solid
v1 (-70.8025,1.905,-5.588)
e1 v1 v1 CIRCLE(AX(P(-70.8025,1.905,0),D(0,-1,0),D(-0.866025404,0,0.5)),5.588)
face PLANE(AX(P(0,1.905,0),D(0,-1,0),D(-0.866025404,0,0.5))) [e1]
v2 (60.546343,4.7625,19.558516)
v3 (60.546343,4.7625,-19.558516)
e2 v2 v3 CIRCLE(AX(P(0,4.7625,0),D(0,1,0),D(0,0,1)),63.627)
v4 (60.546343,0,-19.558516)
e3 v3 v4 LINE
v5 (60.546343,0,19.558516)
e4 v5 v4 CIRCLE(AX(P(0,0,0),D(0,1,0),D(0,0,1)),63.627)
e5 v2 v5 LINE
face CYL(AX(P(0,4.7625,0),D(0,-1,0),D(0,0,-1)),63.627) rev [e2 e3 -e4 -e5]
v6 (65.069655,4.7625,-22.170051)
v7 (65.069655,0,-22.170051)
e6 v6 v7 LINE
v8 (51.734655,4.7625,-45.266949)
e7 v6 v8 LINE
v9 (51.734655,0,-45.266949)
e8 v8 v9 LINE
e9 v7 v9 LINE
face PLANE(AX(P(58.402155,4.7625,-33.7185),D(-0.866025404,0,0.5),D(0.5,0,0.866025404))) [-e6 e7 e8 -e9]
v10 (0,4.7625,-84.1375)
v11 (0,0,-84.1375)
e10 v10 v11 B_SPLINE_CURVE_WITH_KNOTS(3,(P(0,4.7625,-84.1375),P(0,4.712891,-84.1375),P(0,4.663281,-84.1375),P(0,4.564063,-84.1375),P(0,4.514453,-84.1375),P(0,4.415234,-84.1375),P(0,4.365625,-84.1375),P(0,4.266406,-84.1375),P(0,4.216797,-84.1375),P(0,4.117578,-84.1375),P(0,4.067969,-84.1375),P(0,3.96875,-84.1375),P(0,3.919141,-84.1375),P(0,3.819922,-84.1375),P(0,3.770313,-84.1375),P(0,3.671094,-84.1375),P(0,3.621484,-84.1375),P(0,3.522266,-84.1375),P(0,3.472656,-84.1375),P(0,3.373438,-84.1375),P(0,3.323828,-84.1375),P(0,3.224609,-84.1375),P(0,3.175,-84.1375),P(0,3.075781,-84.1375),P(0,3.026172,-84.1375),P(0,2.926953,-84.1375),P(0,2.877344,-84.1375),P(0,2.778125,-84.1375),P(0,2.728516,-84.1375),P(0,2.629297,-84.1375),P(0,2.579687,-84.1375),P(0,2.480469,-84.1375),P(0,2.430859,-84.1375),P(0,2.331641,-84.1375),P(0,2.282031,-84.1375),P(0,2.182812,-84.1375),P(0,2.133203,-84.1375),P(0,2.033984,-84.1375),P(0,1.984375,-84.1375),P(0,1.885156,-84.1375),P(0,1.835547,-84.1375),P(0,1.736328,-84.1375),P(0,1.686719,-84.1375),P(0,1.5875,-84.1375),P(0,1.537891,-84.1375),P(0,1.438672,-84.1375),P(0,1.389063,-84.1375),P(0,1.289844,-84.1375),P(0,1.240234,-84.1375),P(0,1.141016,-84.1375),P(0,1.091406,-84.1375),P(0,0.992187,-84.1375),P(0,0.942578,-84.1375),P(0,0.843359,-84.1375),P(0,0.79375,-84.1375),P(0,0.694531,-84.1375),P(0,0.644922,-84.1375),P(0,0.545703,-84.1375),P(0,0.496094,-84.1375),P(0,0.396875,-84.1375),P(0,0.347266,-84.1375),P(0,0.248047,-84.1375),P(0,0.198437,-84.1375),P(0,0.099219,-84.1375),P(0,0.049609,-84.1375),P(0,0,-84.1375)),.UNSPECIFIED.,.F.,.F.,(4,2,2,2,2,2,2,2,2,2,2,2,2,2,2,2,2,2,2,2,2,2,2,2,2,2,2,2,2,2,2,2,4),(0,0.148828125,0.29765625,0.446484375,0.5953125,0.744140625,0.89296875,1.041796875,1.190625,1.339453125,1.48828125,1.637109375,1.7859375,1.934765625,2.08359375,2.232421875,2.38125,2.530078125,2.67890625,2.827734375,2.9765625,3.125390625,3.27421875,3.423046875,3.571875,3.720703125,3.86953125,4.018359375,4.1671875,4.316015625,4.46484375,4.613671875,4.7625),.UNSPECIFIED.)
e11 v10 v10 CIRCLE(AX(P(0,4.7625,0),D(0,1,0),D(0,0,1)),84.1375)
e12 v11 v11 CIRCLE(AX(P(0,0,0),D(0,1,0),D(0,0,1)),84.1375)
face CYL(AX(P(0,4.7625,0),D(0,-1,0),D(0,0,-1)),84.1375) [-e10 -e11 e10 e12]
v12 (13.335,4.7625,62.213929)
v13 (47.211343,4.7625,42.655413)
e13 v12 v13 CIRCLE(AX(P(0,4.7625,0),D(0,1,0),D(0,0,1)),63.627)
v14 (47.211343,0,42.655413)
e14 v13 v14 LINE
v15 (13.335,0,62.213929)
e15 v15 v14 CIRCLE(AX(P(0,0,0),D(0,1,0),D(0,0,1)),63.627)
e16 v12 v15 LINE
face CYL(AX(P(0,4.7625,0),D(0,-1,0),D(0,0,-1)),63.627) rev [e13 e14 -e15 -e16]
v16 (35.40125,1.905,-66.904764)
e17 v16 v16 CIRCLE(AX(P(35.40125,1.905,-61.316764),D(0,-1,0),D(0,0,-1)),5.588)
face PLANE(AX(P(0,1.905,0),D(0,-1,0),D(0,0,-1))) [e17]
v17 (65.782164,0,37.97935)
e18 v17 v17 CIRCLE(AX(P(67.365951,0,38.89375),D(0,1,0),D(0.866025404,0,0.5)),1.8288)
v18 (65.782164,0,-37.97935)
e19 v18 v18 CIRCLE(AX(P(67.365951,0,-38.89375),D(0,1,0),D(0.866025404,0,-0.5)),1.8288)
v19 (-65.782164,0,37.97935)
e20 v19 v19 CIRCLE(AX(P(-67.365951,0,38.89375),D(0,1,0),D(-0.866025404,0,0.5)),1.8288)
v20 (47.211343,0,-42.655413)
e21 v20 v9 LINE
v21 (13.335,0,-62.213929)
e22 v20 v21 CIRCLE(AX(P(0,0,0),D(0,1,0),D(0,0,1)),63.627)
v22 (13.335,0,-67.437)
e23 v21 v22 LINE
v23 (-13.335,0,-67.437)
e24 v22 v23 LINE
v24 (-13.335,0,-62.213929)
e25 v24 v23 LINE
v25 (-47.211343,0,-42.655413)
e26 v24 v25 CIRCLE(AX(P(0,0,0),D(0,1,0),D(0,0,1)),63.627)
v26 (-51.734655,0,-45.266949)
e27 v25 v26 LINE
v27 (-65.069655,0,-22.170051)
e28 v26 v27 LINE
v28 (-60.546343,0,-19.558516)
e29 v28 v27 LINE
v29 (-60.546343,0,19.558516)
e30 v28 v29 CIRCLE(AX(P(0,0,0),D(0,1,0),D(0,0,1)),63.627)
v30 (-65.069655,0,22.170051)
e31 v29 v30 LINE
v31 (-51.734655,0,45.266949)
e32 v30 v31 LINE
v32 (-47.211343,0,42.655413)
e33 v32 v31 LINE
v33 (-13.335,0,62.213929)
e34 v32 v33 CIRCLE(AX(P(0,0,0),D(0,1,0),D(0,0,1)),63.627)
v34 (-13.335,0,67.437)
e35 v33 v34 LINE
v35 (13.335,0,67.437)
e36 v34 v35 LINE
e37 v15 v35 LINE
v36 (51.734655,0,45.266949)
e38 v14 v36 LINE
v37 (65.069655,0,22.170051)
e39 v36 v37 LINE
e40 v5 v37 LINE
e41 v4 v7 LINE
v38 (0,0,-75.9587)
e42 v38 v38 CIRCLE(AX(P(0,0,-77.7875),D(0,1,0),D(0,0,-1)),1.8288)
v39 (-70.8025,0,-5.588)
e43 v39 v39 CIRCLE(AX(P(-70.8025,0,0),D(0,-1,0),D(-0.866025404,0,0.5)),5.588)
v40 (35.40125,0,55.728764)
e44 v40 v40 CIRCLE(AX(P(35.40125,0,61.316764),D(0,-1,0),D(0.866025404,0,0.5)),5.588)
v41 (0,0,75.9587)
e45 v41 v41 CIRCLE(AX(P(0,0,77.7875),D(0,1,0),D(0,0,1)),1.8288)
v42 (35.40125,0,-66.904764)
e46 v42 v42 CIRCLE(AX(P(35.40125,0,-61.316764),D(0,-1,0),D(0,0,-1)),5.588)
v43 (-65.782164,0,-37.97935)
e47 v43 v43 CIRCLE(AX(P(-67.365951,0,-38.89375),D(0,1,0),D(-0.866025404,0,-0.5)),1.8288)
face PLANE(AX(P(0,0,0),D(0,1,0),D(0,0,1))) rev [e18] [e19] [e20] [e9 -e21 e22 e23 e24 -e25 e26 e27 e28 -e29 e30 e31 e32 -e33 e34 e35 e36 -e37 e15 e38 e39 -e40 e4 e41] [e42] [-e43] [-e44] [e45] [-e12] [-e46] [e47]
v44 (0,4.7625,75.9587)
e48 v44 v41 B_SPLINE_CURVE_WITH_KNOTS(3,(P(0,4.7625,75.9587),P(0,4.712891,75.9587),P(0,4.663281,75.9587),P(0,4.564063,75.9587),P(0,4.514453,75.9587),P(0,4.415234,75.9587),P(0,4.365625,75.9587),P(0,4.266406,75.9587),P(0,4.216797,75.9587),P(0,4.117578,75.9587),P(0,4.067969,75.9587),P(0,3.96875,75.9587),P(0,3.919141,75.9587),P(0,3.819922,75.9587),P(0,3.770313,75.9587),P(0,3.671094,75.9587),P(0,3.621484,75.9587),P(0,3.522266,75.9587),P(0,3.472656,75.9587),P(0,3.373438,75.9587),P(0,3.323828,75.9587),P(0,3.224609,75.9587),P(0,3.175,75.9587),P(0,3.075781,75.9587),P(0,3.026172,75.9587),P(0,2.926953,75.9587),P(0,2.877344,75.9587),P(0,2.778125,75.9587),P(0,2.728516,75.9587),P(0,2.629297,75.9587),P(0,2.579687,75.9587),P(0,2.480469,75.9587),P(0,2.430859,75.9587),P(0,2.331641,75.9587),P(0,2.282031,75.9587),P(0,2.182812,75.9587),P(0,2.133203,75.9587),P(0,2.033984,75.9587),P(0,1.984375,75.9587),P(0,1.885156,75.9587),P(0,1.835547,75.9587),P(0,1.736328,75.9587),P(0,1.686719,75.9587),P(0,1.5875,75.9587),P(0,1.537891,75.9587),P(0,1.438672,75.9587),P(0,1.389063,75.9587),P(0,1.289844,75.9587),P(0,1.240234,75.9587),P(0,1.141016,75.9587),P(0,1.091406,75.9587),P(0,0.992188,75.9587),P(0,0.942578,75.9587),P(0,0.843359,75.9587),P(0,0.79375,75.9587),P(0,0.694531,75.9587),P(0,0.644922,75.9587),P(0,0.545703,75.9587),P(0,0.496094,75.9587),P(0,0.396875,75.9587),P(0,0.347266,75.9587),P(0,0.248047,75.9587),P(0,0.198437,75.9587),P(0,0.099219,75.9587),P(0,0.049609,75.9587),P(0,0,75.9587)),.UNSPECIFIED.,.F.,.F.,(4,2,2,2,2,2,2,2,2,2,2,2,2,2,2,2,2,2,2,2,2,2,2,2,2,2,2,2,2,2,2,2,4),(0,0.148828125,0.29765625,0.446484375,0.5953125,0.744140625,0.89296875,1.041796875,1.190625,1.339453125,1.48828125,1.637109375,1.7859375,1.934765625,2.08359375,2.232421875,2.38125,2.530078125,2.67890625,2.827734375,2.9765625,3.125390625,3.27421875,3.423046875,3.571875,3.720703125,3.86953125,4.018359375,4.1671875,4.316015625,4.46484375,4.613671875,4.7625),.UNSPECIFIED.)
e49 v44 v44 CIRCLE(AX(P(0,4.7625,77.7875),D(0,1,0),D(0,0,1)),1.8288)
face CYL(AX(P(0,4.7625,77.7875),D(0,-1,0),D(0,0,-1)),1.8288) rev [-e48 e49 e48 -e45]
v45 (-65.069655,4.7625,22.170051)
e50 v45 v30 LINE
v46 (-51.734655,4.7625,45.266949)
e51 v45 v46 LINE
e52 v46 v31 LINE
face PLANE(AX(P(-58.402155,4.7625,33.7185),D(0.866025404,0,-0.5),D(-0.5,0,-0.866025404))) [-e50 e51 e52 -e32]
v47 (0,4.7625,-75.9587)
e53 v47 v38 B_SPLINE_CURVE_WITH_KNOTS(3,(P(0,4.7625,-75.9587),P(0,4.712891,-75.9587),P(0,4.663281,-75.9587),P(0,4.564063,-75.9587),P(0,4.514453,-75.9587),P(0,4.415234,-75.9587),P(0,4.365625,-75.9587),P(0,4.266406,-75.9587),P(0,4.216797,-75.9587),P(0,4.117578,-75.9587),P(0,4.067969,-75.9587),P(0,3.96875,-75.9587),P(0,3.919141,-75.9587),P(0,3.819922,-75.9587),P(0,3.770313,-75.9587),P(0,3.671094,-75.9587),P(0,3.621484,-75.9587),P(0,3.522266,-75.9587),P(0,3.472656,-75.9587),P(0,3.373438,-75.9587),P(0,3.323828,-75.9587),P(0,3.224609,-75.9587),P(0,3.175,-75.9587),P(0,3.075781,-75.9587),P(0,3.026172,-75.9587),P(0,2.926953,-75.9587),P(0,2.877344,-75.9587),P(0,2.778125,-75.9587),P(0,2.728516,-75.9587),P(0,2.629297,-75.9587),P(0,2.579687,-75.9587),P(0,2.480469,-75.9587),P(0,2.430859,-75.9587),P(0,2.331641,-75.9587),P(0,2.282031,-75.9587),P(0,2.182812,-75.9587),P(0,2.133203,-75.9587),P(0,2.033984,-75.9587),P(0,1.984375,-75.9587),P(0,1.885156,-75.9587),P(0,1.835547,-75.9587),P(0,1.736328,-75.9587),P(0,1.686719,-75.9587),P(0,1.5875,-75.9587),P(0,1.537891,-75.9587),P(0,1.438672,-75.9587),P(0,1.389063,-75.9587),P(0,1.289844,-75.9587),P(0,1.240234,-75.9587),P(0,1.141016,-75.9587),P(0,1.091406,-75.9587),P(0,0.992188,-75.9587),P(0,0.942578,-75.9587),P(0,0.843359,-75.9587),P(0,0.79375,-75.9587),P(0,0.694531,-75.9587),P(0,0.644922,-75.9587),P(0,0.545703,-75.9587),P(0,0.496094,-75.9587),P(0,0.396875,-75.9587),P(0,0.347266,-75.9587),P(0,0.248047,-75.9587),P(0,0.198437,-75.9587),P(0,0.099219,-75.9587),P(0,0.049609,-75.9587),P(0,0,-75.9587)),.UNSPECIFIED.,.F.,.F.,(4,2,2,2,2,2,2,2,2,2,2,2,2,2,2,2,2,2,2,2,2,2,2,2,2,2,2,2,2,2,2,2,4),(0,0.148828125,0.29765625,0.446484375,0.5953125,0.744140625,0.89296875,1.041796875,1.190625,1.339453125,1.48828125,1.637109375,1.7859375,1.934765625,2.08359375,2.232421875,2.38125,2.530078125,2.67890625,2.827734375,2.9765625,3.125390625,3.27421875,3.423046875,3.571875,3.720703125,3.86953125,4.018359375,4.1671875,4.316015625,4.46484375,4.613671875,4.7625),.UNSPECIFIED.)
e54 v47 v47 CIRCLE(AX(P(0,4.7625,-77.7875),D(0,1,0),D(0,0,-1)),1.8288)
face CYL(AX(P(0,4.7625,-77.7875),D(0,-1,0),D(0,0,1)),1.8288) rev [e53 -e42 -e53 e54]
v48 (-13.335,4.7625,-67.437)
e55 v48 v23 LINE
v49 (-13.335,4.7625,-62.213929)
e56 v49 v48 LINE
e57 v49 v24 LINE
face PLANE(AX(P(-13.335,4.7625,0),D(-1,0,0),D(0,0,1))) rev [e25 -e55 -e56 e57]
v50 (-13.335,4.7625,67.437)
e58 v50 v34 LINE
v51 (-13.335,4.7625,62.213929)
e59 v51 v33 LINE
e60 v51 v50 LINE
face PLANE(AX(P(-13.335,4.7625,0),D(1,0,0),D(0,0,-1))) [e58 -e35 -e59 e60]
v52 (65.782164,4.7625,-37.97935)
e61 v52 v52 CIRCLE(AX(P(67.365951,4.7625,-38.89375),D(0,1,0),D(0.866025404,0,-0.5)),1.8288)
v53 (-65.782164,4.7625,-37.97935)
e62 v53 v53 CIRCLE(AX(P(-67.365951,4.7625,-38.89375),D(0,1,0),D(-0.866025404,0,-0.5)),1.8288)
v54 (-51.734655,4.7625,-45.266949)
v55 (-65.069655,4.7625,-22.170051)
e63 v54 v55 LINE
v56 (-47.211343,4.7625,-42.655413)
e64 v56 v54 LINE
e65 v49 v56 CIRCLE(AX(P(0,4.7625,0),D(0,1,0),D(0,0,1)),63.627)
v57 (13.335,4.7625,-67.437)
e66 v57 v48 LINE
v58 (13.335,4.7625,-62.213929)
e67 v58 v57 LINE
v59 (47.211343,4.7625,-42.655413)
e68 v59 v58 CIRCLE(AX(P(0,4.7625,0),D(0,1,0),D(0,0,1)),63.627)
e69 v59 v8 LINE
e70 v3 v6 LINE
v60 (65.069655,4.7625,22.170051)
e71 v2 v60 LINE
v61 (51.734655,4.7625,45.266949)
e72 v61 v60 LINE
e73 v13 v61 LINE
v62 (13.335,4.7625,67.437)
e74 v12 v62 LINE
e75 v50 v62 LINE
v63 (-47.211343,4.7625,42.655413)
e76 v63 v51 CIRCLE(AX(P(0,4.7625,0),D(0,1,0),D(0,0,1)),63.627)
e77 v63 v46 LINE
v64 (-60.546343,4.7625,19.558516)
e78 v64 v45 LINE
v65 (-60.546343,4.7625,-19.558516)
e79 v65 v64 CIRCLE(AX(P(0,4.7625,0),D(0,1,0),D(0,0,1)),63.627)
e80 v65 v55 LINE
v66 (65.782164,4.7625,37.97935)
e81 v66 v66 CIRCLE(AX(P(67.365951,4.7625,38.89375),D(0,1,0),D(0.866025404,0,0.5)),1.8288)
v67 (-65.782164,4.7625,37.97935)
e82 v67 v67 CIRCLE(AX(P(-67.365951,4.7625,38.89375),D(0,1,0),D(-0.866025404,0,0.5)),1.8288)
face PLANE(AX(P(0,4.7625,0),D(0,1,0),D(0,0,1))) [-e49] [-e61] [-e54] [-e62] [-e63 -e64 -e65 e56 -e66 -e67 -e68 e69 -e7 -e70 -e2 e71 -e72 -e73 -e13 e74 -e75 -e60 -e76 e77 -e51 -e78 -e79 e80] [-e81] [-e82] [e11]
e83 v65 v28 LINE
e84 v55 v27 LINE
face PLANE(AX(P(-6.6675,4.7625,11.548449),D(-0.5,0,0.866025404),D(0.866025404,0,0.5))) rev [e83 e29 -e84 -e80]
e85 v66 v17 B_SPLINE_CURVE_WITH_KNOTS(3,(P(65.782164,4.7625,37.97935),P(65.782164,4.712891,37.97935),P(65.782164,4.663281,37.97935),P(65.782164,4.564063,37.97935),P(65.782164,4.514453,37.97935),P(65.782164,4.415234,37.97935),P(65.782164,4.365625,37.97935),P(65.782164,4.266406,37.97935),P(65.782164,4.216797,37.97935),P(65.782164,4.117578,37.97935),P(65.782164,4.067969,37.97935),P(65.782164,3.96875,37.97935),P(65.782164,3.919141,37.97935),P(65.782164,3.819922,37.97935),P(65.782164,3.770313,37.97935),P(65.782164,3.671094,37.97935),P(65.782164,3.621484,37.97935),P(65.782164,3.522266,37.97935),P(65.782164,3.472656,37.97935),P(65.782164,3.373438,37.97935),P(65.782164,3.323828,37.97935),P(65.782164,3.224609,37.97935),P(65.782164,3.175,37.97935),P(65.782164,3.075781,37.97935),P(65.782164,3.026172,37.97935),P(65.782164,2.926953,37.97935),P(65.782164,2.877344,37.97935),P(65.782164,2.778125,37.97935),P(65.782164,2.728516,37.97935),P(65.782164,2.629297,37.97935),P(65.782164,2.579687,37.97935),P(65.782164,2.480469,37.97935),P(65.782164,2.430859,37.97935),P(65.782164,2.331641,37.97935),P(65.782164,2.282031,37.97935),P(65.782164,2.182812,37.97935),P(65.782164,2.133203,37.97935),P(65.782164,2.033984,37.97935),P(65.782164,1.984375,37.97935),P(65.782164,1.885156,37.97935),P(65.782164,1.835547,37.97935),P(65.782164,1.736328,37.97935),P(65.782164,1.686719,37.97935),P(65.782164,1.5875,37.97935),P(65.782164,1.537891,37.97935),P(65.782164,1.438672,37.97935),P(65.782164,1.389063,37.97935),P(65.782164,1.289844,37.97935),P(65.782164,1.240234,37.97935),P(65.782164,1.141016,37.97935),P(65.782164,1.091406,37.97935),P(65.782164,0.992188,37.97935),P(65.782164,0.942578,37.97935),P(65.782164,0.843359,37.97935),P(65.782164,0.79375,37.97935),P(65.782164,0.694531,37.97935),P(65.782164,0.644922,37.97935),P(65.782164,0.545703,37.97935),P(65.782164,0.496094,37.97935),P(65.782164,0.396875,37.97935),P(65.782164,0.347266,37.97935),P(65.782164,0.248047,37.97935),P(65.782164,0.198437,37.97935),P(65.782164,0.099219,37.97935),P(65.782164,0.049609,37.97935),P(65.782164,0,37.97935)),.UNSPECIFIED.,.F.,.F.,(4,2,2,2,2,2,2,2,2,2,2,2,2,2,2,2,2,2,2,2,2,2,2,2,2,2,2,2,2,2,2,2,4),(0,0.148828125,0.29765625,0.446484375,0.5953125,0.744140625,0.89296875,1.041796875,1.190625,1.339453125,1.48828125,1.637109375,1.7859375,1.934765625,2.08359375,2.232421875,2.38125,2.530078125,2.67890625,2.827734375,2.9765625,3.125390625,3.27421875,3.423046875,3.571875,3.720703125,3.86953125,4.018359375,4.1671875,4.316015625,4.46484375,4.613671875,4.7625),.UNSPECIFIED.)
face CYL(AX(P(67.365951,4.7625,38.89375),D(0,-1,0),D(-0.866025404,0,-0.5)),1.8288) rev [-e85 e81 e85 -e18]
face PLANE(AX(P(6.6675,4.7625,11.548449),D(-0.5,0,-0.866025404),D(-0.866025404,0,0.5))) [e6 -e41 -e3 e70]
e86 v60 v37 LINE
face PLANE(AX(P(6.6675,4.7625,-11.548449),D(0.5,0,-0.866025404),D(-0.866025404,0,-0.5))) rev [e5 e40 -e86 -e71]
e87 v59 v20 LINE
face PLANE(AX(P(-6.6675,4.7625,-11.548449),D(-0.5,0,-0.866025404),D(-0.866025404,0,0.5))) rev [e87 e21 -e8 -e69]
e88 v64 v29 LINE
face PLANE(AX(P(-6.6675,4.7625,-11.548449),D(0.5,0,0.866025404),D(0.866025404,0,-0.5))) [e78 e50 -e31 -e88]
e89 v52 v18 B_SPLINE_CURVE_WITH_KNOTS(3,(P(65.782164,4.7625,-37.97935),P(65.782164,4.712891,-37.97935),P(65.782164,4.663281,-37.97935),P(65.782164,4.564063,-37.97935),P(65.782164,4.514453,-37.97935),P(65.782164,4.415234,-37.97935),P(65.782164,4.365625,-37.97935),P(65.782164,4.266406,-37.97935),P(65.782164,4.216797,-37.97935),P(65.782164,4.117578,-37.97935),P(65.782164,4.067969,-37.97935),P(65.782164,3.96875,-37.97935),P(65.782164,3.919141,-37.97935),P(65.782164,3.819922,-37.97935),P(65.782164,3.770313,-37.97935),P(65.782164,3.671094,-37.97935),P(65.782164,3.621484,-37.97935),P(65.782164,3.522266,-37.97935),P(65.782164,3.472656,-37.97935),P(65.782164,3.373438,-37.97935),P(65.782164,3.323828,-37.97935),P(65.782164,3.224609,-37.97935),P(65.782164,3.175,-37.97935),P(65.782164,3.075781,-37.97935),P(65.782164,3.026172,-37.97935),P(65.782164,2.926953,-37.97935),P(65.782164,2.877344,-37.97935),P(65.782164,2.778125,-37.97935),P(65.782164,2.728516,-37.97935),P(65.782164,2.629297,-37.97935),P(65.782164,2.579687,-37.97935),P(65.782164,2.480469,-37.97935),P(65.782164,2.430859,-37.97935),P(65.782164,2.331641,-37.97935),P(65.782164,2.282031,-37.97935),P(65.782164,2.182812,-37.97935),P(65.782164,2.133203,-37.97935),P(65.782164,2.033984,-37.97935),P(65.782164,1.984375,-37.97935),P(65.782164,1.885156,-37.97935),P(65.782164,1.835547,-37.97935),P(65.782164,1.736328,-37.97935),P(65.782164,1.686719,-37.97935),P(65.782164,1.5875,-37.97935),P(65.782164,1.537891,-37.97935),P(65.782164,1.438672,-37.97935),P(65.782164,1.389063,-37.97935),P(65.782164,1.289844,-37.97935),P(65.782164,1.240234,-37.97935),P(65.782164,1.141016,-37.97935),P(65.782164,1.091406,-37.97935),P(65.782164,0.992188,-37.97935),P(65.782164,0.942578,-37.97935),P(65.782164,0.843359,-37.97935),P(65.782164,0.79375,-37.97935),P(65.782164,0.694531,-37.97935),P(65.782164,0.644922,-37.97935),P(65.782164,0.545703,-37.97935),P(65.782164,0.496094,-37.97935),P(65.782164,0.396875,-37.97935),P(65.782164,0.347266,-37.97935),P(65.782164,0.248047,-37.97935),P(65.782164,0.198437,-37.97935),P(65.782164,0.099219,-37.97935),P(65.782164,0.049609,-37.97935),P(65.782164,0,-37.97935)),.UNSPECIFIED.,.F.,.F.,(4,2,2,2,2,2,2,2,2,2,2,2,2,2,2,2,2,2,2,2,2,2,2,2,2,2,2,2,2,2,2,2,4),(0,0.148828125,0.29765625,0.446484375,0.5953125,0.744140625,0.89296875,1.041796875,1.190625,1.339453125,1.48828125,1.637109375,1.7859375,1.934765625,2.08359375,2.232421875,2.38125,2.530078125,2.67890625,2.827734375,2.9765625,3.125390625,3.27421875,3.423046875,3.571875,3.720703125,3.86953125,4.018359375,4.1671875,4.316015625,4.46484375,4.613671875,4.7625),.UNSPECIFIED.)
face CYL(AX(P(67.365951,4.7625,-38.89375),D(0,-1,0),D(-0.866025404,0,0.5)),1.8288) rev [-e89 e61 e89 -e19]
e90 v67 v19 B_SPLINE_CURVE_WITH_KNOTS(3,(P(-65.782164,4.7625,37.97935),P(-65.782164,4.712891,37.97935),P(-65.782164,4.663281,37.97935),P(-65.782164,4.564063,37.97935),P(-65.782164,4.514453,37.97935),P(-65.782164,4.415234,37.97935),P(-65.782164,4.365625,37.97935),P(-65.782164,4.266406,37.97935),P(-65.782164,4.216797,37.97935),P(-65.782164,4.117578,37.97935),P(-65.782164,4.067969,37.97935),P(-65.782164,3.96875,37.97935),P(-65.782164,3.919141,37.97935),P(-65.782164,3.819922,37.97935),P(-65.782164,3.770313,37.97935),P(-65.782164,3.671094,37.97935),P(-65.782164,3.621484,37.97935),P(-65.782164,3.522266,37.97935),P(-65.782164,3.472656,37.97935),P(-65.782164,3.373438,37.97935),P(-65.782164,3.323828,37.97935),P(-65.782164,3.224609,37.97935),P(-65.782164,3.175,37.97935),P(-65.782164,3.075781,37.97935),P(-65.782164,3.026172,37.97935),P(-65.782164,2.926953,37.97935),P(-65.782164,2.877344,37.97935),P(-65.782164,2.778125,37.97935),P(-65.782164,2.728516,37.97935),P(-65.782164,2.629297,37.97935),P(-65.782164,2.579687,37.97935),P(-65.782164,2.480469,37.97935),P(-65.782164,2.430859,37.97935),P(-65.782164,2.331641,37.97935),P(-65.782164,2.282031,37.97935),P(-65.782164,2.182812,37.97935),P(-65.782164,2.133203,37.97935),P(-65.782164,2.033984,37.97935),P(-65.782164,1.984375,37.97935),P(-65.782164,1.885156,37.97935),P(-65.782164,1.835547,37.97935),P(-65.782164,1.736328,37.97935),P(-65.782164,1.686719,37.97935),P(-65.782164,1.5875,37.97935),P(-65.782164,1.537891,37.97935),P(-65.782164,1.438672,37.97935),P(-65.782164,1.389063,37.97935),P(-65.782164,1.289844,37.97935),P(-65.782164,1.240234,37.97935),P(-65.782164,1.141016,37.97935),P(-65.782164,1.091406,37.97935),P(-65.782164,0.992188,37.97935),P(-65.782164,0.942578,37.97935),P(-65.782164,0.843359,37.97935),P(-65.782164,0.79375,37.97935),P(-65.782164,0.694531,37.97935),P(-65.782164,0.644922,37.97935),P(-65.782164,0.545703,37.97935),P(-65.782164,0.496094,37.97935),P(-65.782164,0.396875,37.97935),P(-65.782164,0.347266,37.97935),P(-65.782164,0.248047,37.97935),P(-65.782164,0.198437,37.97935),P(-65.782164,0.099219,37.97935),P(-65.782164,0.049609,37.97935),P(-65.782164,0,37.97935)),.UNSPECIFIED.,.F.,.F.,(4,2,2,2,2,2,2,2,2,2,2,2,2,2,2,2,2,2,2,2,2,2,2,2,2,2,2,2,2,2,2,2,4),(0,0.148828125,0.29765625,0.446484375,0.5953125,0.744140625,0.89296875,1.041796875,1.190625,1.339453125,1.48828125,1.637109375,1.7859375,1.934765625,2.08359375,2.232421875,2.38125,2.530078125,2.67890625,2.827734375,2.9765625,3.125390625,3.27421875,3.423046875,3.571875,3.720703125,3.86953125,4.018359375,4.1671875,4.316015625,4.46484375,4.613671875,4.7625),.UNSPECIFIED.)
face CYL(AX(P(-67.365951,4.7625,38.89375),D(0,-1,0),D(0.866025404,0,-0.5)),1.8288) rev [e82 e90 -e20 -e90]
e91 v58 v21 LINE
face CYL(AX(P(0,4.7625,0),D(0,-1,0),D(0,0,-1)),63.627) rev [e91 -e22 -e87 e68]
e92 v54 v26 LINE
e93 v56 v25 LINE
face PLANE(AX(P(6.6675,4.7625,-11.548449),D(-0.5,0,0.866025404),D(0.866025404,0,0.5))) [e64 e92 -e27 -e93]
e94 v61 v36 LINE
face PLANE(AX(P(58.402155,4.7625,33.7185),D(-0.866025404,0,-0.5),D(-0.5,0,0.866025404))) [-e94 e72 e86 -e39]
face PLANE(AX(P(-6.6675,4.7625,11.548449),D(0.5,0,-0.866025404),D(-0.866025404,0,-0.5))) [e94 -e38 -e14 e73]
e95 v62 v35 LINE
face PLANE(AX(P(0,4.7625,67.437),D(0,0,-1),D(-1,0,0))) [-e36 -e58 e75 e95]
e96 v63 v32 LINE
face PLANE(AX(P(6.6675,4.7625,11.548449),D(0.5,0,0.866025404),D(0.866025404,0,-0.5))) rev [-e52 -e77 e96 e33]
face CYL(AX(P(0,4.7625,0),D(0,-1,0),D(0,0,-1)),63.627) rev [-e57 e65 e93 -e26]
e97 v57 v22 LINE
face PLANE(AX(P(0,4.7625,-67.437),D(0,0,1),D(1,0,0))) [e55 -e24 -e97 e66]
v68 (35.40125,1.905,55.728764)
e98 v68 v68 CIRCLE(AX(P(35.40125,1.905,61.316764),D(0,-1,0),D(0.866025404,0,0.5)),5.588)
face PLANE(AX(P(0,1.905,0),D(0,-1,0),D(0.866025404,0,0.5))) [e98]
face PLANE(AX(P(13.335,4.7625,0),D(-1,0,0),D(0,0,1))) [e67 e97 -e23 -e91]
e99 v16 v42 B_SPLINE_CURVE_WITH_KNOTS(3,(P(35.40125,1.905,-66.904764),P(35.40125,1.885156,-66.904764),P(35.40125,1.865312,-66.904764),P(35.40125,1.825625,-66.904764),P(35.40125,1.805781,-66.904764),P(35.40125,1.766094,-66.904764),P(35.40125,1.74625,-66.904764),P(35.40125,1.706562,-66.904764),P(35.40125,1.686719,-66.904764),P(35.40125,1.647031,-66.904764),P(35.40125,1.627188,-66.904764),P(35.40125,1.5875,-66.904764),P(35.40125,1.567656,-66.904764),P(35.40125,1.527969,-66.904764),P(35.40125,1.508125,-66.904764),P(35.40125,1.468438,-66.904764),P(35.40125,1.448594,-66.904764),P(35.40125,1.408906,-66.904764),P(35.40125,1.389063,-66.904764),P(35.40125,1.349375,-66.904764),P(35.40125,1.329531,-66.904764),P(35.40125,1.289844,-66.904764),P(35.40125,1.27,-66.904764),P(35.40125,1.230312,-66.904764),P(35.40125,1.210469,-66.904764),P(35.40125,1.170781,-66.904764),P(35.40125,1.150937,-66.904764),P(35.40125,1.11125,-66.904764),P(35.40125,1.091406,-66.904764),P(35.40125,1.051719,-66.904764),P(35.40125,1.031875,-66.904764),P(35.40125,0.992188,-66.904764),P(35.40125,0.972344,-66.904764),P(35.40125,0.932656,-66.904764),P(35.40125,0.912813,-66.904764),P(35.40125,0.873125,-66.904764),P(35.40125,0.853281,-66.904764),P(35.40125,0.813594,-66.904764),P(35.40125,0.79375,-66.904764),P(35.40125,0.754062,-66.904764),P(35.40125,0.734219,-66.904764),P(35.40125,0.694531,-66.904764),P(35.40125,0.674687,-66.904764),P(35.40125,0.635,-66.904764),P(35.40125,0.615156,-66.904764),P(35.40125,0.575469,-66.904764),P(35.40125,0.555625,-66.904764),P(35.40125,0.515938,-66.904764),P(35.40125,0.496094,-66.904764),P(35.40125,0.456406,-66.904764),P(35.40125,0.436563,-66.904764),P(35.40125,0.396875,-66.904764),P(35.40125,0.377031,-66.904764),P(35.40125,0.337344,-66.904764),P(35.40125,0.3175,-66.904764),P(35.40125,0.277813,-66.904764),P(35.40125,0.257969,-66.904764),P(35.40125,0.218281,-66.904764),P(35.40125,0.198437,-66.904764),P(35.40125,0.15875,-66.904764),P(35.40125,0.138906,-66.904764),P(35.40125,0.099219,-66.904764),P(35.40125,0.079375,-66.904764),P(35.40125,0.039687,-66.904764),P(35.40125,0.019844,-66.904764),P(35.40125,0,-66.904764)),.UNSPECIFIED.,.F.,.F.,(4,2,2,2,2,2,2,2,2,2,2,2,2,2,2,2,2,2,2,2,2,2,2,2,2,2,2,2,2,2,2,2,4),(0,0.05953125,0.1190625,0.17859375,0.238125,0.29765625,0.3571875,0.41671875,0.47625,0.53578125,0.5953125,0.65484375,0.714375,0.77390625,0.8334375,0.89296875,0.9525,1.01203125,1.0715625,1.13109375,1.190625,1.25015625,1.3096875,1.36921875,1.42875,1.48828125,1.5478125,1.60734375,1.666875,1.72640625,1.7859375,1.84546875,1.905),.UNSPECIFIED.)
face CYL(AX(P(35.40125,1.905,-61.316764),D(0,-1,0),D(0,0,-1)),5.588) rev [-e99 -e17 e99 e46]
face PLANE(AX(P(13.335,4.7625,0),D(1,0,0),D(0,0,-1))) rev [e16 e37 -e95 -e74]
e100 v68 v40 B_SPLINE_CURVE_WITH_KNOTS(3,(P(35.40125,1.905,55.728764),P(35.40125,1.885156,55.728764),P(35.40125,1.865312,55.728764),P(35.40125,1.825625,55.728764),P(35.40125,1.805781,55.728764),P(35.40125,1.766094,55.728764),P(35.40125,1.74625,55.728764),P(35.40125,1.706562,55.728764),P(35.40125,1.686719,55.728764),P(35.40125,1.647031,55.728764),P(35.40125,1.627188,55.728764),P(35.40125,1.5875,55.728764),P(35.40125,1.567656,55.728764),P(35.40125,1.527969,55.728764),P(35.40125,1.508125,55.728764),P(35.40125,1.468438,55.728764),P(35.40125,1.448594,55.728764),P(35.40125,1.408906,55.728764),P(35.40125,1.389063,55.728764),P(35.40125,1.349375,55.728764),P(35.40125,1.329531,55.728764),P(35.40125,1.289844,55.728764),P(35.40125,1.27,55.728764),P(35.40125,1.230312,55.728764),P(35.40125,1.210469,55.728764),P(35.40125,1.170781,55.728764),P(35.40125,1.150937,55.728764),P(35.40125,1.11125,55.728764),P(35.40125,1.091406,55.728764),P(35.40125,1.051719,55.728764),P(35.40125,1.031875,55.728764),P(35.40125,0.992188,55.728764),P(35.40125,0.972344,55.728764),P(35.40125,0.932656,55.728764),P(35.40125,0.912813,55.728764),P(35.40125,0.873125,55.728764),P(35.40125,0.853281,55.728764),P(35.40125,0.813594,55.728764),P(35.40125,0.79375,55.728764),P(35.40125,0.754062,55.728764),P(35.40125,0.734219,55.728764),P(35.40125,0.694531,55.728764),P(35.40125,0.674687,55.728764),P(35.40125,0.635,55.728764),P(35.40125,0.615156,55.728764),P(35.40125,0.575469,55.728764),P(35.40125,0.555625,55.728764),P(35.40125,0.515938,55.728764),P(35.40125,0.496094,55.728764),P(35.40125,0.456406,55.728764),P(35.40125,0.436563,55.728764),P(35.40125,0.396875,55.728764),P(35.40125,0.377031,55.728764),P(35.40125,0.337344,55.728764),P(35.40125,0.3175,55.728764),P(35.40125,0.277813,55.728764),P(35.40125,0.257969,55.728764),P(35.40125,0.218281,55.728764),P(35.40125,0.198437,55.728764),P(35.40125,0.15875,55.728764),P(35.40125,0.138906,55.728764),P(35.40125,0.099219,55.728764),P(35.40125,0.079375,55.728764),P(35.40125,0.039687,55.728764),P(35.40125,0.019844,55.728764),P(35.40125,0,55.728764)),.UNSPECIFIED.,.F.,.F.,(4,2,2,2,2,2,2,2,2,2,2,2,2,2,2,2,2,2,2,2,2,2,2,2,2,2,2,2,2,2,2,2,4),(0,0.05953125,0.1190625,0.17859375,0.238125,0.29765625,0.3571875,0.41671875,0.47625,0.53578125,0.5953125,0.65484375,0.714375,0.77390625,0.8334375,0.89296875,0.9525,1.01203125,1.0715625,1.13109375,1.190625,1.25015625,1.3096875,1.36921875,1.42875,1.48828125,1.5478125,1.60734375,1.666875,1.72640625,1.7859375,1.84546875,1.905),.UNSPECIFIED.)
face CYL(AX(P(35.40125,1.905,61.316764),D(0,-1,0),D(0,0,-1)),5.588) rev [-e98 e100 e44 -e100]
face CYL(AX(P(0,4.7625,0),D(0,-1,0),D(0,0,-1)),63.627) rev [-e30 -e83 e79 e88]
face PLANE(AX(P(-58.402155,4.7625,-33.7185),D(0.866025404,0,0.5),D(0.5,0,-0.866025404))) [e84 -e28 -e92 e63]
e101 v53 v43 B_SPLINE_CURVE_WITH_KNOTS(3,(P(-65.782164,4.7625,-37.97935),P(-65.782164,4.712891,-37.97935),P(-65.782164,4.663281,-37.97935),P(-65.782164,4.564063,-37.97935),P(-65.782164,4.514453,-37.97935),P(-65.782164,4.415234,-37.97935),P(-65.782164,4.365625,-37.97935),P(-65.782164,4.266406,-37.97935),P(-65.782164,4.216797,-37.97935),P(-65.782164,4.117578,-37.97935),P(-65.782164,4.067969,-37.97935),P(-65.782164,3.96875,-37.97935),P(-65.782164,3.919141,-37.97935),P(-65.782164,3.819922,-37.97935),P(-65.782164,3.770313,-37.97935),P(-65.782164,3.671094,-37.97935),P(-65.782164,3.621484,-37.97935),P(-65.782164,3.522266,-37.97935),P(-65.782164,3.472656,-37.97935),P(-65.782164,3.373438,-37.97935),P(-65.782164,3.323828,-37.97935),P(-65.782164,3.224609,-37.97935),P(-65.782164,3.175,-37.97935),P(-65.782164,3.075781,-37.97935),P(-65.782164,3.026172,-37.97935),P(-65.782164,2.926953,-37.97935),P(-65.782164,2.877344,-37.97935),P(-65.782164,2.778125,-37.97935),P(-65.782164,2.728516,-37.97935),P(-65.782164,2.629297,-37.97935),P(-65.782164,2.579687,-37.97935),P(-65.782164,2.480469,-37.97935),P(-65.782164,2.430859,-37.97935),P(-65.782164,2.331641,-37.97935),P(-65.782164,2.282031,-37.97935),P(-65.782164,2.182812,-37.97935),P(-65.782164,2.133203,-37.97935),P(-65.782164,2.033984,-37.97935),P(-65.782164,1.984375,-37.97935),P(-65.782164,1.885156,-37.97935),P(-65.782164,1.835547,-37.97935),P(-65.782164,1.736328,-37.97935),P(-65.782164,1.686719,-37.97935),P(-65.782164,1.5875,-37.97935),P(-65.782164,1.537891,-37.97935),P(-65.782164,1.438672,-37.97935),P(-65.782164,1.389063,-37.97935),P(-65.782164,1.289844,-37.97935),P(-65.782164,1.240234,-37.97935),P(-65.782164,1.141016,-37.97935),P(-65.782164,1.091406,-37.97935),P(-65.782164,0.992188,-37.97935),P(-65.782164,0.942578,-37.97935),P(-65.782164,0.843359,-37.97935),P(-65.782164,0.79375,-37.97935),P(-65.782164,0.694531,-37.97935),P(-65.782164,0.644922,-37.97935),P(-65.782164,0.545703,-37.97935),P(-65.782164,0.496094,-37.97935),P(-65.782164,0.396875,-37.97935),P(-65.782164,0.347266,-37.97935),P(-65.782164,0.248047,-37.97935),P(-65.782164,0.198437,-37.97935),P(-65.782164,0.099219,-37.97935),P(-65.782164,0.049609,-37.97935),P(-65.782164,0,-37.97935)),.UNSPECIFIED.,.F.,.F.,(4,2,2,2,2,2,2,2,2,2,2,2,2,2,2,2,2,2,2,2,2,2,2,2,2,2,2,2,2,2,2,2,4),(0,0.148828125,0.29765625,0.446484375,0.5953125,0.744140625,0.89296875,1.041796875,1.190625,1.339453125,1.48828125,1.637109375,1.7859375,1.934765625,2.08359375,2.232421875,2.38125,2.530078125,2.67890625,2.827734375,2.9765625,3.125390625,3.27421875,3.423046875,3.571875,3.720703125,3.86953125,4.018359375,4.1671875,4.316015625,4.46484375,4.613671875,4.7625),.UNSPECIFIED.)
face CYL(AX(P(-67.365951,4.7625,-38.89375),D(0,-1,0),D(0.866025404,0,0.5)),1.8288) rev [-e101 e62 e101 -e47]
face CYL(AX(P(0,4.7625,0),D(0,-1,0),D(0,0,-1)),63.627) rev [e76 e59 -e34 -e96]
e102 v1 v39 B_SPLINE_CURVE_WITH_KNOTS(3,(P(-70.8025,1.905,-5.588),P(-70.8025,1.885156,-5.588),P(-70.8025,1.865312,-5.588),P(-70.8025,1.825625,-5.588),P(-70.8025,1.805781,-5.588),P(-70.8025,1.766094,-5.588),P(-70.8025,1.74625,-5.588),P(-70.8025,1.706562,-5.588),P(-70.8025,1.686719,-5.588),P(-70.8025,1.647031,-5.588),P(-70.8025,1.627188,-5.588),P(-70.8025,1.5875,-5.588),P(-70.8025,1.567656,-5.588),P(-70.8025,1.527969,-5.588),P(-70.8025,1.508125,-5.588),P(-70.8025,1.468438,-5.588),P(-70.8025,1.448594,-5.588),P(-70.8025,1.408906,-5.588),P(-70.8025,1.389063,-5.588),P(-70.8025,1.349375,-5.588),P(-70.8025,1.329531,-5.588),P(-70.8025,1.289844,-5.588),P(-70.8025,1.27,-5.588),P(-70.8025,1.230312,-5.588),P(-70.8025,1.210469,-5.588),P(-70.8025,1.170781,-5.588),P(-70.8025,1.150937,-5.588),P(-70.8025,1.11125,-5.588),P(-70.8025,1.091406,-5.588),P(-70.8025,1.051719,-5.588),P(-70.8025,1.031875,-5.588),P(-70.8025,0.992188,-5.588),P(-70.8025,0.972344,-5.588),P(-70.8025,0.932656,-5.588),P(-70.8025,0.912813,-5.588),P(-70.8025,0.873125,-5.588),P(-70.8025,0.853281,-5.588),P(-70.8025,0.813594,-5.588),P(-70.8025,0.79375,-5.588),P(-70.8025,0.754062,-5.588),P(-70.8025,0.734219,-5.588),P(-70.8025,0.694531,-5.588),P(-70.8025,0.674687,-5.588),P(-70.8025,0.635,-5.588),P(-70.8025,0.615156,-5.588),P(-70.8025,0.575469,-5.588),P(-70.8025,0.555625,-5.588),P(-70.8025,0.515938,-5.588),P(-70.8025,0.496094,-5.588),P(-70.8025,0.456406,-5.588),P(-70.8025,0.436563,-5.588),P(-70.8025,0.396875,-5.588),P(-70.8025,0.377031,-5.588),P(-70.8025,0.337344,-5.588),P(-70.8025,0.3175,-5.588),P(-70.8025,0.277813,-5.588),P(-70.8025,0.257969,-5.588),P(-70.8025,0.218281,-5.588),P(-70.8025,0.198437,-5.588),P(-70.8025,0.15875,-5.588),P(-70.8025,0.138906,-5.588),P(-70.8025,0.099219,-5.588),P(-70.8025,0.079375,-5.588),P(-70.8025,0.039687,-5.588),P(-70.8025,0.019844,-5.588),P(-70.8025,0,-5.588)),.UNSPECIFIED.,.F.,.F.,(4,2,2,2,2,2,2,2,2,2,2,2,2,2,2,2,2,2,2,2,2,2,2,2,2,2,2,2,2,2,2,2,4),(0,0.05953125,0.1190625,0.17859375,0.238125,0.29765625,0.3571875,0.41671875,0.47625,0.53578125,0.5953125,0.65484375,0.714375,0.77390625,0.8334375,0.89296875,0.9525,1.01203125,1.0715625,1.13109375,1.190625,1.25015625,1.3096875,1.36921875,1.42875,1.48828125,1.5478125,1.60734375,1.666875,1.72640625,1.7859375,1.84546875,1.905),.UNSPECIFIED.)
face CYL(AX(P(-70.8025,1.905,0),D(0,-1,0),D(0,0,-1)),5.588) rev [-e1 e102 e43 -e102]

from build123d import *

# Parameters (mm, degrees)
SKETCH1_R             = 84.1375
SKETCH1_R_2           = 1.8288
BOSS_EXTRUDE1_DEPTH   = 4.7625
CIRPATTERN1_OUTLINE_R = 1.8288
CIRPATTERN1_DEPTH     = 4.7625
SKETCH4_R             = 5.588
CUT_EXTRUDE1_DEPTH    = 1.905
CIRPATTERN2_COUNT     = 3


# Read off the part's stored shape, not the designer's step: CirPattern1
with BuildPart() as part:
    # Sketch1 → Boss-Extrude1 (new body)
    with BuildSketch(Plane(origin=(0, 0, 0), x_dir=(1, 0, 0), z_dir=(0, 1, 0))):
        with Locations(Location((0, 0, 0), (0, 0, 90))):
            Circle(SKETCH1_R)
        with BuildLine():
            ThreePointArc((-13.335, -62.213928537), (0, 63.627), (13.335, -62.213928537))
            Line((13.335, -62.213928537), (13.335, -67.437))
            Line((13.335, -67.437), (-13.335, -67.437))
            Line((-13.335, -67.437), (-13.335, -62.213928537))
        make_face(mode=Mode.SUBTRACT)
        with Locations(Location((0, -77.7875, 0), (0, 0, 90))):
            Circle(SKETCH1_R_2, mode=Mode.SUBTRACT)
    extrude(amount=BOSS_EXTRUDE1_DEPTH)

    # CirPattern1 outline → CirPattern1 (cut)
    with BuildSketch(Plane(origin=(0, 0, 0), x_dir=(1, 0, 0), z_dir=(0, 1, 0))):
        with BuildLine():
            Line((65.069655155, -22.170051241), (60.546342582, -19.558515509))
            ThreePointArc((60.546342582, -19.558515509), (55.102598367, -31.8135), (47.211342582, -42.655413028))
            Line((47.211342582, -42.655413028), (51.734655155, -45.266948759))
            Line((51.734655155, -45.266948759), (65.069655155, -22.170051241))
        make_face()
        with BuildLine():
            Line((51.734655155, 45.266948759), (47.211342582, 42.655413028))
            ThreePointArc((47.211342582, 42.655413028), (55.102598367, 31.8135), (60.546342582, 19.558515509))
            Line((60.546342582, 19.558515509), (65.069655155, 22.170051241))
            Line((65.069655155, 22.170051241), (51.734655155, 45.266948759))
        make_face()
        with BuildLine():
            Line((-13.335, 67.437), (-13.335, 62.213928537))
            ThreePointArc((-13.335, 62.213928537), (0, 63.627), (13.335, 62.213928537))
            Line((13.335, 62.213928537), (13.335, 67.437))
            Line((13.335, 67.437), (-13.335, 67.437))
        make_face()
        with BuildLine():
            Line((-65.069655155, 22.170051241), (-60.546342582, 19.558515509))
            ThreePointArc((-60.546342582, 19.558515509), (-55.102598367, 31.8135), (-47.211342582, 42.655413028))
            Line((-47.211342582, 42.655413028), (-51.734655155, 45.266948759))
            Line((-51.734655155, 45.266948759), (-65.069655155, 22.170051241))
        make_face()
        with BuildLine():
            Line((-65.069655155, -22.170051241), (-51.734655155, -45.266948759))
            Line((-51.734655155, -45.266948759), (-47.211342582, -42.655413028))
            ThreePointArc((-47.211342582, -42.655413028), (-55.102598367, -31.8135), (-60.546342582, -19.558515509))
            Line((-60.546342582, -19.558515509), (-65.069655155, -22.170051241))
        make_face()
        with Locations((-67.365951097, -38.89375)):
            Circle(CIRPATTERN1_OUTLINE_R)
        with Locations((-67.365951097, 38.89375)):
            Circle(CIRPATTERN1_OUTLINE_R)
        with Locations((0, 77.7875)):
            Circle(CIRPATTERN1_OUTLINE_R)
        with Locations((67.365951097, 38.89375)):
            Circle(CIRPATTERN1_OUTLINE_R)
        with Locations((67.365951097, -38.89375)):
            Circle(CIRPATTERN1_OUTLINE_R)
    extrude(amount=CIRPATTERN1_DEPTH, mode=Mode.SUBTRACT)

    # Sketch4 → Cut-Extrude1 (cut)
    with BuildSketch(Plane.XZ):
        with Locations(Location((35.40125, -61.316763651, 0), (0, 0, 270))):
            Circle(SKETCH4_R)
    cut_extrude1 = extrude(amount=-CUT_EXTRUDE1_DEPTH, mode=Mode.SUBTRACT)

    # CirPattern2: Cut-Extrude1 ×3 about axis
    cirpattern2_axis = Axis((0, 0, 0), (0, 1, 0))
    for i in range(1, CIRPATTERN2_COUNT):
        add(cut_extrude1.rotate(cirpattern2_axis, i * 360 / CIRPATTERN2_COUNT), mode=Mode.SUBTRACT)


solid = part.part
